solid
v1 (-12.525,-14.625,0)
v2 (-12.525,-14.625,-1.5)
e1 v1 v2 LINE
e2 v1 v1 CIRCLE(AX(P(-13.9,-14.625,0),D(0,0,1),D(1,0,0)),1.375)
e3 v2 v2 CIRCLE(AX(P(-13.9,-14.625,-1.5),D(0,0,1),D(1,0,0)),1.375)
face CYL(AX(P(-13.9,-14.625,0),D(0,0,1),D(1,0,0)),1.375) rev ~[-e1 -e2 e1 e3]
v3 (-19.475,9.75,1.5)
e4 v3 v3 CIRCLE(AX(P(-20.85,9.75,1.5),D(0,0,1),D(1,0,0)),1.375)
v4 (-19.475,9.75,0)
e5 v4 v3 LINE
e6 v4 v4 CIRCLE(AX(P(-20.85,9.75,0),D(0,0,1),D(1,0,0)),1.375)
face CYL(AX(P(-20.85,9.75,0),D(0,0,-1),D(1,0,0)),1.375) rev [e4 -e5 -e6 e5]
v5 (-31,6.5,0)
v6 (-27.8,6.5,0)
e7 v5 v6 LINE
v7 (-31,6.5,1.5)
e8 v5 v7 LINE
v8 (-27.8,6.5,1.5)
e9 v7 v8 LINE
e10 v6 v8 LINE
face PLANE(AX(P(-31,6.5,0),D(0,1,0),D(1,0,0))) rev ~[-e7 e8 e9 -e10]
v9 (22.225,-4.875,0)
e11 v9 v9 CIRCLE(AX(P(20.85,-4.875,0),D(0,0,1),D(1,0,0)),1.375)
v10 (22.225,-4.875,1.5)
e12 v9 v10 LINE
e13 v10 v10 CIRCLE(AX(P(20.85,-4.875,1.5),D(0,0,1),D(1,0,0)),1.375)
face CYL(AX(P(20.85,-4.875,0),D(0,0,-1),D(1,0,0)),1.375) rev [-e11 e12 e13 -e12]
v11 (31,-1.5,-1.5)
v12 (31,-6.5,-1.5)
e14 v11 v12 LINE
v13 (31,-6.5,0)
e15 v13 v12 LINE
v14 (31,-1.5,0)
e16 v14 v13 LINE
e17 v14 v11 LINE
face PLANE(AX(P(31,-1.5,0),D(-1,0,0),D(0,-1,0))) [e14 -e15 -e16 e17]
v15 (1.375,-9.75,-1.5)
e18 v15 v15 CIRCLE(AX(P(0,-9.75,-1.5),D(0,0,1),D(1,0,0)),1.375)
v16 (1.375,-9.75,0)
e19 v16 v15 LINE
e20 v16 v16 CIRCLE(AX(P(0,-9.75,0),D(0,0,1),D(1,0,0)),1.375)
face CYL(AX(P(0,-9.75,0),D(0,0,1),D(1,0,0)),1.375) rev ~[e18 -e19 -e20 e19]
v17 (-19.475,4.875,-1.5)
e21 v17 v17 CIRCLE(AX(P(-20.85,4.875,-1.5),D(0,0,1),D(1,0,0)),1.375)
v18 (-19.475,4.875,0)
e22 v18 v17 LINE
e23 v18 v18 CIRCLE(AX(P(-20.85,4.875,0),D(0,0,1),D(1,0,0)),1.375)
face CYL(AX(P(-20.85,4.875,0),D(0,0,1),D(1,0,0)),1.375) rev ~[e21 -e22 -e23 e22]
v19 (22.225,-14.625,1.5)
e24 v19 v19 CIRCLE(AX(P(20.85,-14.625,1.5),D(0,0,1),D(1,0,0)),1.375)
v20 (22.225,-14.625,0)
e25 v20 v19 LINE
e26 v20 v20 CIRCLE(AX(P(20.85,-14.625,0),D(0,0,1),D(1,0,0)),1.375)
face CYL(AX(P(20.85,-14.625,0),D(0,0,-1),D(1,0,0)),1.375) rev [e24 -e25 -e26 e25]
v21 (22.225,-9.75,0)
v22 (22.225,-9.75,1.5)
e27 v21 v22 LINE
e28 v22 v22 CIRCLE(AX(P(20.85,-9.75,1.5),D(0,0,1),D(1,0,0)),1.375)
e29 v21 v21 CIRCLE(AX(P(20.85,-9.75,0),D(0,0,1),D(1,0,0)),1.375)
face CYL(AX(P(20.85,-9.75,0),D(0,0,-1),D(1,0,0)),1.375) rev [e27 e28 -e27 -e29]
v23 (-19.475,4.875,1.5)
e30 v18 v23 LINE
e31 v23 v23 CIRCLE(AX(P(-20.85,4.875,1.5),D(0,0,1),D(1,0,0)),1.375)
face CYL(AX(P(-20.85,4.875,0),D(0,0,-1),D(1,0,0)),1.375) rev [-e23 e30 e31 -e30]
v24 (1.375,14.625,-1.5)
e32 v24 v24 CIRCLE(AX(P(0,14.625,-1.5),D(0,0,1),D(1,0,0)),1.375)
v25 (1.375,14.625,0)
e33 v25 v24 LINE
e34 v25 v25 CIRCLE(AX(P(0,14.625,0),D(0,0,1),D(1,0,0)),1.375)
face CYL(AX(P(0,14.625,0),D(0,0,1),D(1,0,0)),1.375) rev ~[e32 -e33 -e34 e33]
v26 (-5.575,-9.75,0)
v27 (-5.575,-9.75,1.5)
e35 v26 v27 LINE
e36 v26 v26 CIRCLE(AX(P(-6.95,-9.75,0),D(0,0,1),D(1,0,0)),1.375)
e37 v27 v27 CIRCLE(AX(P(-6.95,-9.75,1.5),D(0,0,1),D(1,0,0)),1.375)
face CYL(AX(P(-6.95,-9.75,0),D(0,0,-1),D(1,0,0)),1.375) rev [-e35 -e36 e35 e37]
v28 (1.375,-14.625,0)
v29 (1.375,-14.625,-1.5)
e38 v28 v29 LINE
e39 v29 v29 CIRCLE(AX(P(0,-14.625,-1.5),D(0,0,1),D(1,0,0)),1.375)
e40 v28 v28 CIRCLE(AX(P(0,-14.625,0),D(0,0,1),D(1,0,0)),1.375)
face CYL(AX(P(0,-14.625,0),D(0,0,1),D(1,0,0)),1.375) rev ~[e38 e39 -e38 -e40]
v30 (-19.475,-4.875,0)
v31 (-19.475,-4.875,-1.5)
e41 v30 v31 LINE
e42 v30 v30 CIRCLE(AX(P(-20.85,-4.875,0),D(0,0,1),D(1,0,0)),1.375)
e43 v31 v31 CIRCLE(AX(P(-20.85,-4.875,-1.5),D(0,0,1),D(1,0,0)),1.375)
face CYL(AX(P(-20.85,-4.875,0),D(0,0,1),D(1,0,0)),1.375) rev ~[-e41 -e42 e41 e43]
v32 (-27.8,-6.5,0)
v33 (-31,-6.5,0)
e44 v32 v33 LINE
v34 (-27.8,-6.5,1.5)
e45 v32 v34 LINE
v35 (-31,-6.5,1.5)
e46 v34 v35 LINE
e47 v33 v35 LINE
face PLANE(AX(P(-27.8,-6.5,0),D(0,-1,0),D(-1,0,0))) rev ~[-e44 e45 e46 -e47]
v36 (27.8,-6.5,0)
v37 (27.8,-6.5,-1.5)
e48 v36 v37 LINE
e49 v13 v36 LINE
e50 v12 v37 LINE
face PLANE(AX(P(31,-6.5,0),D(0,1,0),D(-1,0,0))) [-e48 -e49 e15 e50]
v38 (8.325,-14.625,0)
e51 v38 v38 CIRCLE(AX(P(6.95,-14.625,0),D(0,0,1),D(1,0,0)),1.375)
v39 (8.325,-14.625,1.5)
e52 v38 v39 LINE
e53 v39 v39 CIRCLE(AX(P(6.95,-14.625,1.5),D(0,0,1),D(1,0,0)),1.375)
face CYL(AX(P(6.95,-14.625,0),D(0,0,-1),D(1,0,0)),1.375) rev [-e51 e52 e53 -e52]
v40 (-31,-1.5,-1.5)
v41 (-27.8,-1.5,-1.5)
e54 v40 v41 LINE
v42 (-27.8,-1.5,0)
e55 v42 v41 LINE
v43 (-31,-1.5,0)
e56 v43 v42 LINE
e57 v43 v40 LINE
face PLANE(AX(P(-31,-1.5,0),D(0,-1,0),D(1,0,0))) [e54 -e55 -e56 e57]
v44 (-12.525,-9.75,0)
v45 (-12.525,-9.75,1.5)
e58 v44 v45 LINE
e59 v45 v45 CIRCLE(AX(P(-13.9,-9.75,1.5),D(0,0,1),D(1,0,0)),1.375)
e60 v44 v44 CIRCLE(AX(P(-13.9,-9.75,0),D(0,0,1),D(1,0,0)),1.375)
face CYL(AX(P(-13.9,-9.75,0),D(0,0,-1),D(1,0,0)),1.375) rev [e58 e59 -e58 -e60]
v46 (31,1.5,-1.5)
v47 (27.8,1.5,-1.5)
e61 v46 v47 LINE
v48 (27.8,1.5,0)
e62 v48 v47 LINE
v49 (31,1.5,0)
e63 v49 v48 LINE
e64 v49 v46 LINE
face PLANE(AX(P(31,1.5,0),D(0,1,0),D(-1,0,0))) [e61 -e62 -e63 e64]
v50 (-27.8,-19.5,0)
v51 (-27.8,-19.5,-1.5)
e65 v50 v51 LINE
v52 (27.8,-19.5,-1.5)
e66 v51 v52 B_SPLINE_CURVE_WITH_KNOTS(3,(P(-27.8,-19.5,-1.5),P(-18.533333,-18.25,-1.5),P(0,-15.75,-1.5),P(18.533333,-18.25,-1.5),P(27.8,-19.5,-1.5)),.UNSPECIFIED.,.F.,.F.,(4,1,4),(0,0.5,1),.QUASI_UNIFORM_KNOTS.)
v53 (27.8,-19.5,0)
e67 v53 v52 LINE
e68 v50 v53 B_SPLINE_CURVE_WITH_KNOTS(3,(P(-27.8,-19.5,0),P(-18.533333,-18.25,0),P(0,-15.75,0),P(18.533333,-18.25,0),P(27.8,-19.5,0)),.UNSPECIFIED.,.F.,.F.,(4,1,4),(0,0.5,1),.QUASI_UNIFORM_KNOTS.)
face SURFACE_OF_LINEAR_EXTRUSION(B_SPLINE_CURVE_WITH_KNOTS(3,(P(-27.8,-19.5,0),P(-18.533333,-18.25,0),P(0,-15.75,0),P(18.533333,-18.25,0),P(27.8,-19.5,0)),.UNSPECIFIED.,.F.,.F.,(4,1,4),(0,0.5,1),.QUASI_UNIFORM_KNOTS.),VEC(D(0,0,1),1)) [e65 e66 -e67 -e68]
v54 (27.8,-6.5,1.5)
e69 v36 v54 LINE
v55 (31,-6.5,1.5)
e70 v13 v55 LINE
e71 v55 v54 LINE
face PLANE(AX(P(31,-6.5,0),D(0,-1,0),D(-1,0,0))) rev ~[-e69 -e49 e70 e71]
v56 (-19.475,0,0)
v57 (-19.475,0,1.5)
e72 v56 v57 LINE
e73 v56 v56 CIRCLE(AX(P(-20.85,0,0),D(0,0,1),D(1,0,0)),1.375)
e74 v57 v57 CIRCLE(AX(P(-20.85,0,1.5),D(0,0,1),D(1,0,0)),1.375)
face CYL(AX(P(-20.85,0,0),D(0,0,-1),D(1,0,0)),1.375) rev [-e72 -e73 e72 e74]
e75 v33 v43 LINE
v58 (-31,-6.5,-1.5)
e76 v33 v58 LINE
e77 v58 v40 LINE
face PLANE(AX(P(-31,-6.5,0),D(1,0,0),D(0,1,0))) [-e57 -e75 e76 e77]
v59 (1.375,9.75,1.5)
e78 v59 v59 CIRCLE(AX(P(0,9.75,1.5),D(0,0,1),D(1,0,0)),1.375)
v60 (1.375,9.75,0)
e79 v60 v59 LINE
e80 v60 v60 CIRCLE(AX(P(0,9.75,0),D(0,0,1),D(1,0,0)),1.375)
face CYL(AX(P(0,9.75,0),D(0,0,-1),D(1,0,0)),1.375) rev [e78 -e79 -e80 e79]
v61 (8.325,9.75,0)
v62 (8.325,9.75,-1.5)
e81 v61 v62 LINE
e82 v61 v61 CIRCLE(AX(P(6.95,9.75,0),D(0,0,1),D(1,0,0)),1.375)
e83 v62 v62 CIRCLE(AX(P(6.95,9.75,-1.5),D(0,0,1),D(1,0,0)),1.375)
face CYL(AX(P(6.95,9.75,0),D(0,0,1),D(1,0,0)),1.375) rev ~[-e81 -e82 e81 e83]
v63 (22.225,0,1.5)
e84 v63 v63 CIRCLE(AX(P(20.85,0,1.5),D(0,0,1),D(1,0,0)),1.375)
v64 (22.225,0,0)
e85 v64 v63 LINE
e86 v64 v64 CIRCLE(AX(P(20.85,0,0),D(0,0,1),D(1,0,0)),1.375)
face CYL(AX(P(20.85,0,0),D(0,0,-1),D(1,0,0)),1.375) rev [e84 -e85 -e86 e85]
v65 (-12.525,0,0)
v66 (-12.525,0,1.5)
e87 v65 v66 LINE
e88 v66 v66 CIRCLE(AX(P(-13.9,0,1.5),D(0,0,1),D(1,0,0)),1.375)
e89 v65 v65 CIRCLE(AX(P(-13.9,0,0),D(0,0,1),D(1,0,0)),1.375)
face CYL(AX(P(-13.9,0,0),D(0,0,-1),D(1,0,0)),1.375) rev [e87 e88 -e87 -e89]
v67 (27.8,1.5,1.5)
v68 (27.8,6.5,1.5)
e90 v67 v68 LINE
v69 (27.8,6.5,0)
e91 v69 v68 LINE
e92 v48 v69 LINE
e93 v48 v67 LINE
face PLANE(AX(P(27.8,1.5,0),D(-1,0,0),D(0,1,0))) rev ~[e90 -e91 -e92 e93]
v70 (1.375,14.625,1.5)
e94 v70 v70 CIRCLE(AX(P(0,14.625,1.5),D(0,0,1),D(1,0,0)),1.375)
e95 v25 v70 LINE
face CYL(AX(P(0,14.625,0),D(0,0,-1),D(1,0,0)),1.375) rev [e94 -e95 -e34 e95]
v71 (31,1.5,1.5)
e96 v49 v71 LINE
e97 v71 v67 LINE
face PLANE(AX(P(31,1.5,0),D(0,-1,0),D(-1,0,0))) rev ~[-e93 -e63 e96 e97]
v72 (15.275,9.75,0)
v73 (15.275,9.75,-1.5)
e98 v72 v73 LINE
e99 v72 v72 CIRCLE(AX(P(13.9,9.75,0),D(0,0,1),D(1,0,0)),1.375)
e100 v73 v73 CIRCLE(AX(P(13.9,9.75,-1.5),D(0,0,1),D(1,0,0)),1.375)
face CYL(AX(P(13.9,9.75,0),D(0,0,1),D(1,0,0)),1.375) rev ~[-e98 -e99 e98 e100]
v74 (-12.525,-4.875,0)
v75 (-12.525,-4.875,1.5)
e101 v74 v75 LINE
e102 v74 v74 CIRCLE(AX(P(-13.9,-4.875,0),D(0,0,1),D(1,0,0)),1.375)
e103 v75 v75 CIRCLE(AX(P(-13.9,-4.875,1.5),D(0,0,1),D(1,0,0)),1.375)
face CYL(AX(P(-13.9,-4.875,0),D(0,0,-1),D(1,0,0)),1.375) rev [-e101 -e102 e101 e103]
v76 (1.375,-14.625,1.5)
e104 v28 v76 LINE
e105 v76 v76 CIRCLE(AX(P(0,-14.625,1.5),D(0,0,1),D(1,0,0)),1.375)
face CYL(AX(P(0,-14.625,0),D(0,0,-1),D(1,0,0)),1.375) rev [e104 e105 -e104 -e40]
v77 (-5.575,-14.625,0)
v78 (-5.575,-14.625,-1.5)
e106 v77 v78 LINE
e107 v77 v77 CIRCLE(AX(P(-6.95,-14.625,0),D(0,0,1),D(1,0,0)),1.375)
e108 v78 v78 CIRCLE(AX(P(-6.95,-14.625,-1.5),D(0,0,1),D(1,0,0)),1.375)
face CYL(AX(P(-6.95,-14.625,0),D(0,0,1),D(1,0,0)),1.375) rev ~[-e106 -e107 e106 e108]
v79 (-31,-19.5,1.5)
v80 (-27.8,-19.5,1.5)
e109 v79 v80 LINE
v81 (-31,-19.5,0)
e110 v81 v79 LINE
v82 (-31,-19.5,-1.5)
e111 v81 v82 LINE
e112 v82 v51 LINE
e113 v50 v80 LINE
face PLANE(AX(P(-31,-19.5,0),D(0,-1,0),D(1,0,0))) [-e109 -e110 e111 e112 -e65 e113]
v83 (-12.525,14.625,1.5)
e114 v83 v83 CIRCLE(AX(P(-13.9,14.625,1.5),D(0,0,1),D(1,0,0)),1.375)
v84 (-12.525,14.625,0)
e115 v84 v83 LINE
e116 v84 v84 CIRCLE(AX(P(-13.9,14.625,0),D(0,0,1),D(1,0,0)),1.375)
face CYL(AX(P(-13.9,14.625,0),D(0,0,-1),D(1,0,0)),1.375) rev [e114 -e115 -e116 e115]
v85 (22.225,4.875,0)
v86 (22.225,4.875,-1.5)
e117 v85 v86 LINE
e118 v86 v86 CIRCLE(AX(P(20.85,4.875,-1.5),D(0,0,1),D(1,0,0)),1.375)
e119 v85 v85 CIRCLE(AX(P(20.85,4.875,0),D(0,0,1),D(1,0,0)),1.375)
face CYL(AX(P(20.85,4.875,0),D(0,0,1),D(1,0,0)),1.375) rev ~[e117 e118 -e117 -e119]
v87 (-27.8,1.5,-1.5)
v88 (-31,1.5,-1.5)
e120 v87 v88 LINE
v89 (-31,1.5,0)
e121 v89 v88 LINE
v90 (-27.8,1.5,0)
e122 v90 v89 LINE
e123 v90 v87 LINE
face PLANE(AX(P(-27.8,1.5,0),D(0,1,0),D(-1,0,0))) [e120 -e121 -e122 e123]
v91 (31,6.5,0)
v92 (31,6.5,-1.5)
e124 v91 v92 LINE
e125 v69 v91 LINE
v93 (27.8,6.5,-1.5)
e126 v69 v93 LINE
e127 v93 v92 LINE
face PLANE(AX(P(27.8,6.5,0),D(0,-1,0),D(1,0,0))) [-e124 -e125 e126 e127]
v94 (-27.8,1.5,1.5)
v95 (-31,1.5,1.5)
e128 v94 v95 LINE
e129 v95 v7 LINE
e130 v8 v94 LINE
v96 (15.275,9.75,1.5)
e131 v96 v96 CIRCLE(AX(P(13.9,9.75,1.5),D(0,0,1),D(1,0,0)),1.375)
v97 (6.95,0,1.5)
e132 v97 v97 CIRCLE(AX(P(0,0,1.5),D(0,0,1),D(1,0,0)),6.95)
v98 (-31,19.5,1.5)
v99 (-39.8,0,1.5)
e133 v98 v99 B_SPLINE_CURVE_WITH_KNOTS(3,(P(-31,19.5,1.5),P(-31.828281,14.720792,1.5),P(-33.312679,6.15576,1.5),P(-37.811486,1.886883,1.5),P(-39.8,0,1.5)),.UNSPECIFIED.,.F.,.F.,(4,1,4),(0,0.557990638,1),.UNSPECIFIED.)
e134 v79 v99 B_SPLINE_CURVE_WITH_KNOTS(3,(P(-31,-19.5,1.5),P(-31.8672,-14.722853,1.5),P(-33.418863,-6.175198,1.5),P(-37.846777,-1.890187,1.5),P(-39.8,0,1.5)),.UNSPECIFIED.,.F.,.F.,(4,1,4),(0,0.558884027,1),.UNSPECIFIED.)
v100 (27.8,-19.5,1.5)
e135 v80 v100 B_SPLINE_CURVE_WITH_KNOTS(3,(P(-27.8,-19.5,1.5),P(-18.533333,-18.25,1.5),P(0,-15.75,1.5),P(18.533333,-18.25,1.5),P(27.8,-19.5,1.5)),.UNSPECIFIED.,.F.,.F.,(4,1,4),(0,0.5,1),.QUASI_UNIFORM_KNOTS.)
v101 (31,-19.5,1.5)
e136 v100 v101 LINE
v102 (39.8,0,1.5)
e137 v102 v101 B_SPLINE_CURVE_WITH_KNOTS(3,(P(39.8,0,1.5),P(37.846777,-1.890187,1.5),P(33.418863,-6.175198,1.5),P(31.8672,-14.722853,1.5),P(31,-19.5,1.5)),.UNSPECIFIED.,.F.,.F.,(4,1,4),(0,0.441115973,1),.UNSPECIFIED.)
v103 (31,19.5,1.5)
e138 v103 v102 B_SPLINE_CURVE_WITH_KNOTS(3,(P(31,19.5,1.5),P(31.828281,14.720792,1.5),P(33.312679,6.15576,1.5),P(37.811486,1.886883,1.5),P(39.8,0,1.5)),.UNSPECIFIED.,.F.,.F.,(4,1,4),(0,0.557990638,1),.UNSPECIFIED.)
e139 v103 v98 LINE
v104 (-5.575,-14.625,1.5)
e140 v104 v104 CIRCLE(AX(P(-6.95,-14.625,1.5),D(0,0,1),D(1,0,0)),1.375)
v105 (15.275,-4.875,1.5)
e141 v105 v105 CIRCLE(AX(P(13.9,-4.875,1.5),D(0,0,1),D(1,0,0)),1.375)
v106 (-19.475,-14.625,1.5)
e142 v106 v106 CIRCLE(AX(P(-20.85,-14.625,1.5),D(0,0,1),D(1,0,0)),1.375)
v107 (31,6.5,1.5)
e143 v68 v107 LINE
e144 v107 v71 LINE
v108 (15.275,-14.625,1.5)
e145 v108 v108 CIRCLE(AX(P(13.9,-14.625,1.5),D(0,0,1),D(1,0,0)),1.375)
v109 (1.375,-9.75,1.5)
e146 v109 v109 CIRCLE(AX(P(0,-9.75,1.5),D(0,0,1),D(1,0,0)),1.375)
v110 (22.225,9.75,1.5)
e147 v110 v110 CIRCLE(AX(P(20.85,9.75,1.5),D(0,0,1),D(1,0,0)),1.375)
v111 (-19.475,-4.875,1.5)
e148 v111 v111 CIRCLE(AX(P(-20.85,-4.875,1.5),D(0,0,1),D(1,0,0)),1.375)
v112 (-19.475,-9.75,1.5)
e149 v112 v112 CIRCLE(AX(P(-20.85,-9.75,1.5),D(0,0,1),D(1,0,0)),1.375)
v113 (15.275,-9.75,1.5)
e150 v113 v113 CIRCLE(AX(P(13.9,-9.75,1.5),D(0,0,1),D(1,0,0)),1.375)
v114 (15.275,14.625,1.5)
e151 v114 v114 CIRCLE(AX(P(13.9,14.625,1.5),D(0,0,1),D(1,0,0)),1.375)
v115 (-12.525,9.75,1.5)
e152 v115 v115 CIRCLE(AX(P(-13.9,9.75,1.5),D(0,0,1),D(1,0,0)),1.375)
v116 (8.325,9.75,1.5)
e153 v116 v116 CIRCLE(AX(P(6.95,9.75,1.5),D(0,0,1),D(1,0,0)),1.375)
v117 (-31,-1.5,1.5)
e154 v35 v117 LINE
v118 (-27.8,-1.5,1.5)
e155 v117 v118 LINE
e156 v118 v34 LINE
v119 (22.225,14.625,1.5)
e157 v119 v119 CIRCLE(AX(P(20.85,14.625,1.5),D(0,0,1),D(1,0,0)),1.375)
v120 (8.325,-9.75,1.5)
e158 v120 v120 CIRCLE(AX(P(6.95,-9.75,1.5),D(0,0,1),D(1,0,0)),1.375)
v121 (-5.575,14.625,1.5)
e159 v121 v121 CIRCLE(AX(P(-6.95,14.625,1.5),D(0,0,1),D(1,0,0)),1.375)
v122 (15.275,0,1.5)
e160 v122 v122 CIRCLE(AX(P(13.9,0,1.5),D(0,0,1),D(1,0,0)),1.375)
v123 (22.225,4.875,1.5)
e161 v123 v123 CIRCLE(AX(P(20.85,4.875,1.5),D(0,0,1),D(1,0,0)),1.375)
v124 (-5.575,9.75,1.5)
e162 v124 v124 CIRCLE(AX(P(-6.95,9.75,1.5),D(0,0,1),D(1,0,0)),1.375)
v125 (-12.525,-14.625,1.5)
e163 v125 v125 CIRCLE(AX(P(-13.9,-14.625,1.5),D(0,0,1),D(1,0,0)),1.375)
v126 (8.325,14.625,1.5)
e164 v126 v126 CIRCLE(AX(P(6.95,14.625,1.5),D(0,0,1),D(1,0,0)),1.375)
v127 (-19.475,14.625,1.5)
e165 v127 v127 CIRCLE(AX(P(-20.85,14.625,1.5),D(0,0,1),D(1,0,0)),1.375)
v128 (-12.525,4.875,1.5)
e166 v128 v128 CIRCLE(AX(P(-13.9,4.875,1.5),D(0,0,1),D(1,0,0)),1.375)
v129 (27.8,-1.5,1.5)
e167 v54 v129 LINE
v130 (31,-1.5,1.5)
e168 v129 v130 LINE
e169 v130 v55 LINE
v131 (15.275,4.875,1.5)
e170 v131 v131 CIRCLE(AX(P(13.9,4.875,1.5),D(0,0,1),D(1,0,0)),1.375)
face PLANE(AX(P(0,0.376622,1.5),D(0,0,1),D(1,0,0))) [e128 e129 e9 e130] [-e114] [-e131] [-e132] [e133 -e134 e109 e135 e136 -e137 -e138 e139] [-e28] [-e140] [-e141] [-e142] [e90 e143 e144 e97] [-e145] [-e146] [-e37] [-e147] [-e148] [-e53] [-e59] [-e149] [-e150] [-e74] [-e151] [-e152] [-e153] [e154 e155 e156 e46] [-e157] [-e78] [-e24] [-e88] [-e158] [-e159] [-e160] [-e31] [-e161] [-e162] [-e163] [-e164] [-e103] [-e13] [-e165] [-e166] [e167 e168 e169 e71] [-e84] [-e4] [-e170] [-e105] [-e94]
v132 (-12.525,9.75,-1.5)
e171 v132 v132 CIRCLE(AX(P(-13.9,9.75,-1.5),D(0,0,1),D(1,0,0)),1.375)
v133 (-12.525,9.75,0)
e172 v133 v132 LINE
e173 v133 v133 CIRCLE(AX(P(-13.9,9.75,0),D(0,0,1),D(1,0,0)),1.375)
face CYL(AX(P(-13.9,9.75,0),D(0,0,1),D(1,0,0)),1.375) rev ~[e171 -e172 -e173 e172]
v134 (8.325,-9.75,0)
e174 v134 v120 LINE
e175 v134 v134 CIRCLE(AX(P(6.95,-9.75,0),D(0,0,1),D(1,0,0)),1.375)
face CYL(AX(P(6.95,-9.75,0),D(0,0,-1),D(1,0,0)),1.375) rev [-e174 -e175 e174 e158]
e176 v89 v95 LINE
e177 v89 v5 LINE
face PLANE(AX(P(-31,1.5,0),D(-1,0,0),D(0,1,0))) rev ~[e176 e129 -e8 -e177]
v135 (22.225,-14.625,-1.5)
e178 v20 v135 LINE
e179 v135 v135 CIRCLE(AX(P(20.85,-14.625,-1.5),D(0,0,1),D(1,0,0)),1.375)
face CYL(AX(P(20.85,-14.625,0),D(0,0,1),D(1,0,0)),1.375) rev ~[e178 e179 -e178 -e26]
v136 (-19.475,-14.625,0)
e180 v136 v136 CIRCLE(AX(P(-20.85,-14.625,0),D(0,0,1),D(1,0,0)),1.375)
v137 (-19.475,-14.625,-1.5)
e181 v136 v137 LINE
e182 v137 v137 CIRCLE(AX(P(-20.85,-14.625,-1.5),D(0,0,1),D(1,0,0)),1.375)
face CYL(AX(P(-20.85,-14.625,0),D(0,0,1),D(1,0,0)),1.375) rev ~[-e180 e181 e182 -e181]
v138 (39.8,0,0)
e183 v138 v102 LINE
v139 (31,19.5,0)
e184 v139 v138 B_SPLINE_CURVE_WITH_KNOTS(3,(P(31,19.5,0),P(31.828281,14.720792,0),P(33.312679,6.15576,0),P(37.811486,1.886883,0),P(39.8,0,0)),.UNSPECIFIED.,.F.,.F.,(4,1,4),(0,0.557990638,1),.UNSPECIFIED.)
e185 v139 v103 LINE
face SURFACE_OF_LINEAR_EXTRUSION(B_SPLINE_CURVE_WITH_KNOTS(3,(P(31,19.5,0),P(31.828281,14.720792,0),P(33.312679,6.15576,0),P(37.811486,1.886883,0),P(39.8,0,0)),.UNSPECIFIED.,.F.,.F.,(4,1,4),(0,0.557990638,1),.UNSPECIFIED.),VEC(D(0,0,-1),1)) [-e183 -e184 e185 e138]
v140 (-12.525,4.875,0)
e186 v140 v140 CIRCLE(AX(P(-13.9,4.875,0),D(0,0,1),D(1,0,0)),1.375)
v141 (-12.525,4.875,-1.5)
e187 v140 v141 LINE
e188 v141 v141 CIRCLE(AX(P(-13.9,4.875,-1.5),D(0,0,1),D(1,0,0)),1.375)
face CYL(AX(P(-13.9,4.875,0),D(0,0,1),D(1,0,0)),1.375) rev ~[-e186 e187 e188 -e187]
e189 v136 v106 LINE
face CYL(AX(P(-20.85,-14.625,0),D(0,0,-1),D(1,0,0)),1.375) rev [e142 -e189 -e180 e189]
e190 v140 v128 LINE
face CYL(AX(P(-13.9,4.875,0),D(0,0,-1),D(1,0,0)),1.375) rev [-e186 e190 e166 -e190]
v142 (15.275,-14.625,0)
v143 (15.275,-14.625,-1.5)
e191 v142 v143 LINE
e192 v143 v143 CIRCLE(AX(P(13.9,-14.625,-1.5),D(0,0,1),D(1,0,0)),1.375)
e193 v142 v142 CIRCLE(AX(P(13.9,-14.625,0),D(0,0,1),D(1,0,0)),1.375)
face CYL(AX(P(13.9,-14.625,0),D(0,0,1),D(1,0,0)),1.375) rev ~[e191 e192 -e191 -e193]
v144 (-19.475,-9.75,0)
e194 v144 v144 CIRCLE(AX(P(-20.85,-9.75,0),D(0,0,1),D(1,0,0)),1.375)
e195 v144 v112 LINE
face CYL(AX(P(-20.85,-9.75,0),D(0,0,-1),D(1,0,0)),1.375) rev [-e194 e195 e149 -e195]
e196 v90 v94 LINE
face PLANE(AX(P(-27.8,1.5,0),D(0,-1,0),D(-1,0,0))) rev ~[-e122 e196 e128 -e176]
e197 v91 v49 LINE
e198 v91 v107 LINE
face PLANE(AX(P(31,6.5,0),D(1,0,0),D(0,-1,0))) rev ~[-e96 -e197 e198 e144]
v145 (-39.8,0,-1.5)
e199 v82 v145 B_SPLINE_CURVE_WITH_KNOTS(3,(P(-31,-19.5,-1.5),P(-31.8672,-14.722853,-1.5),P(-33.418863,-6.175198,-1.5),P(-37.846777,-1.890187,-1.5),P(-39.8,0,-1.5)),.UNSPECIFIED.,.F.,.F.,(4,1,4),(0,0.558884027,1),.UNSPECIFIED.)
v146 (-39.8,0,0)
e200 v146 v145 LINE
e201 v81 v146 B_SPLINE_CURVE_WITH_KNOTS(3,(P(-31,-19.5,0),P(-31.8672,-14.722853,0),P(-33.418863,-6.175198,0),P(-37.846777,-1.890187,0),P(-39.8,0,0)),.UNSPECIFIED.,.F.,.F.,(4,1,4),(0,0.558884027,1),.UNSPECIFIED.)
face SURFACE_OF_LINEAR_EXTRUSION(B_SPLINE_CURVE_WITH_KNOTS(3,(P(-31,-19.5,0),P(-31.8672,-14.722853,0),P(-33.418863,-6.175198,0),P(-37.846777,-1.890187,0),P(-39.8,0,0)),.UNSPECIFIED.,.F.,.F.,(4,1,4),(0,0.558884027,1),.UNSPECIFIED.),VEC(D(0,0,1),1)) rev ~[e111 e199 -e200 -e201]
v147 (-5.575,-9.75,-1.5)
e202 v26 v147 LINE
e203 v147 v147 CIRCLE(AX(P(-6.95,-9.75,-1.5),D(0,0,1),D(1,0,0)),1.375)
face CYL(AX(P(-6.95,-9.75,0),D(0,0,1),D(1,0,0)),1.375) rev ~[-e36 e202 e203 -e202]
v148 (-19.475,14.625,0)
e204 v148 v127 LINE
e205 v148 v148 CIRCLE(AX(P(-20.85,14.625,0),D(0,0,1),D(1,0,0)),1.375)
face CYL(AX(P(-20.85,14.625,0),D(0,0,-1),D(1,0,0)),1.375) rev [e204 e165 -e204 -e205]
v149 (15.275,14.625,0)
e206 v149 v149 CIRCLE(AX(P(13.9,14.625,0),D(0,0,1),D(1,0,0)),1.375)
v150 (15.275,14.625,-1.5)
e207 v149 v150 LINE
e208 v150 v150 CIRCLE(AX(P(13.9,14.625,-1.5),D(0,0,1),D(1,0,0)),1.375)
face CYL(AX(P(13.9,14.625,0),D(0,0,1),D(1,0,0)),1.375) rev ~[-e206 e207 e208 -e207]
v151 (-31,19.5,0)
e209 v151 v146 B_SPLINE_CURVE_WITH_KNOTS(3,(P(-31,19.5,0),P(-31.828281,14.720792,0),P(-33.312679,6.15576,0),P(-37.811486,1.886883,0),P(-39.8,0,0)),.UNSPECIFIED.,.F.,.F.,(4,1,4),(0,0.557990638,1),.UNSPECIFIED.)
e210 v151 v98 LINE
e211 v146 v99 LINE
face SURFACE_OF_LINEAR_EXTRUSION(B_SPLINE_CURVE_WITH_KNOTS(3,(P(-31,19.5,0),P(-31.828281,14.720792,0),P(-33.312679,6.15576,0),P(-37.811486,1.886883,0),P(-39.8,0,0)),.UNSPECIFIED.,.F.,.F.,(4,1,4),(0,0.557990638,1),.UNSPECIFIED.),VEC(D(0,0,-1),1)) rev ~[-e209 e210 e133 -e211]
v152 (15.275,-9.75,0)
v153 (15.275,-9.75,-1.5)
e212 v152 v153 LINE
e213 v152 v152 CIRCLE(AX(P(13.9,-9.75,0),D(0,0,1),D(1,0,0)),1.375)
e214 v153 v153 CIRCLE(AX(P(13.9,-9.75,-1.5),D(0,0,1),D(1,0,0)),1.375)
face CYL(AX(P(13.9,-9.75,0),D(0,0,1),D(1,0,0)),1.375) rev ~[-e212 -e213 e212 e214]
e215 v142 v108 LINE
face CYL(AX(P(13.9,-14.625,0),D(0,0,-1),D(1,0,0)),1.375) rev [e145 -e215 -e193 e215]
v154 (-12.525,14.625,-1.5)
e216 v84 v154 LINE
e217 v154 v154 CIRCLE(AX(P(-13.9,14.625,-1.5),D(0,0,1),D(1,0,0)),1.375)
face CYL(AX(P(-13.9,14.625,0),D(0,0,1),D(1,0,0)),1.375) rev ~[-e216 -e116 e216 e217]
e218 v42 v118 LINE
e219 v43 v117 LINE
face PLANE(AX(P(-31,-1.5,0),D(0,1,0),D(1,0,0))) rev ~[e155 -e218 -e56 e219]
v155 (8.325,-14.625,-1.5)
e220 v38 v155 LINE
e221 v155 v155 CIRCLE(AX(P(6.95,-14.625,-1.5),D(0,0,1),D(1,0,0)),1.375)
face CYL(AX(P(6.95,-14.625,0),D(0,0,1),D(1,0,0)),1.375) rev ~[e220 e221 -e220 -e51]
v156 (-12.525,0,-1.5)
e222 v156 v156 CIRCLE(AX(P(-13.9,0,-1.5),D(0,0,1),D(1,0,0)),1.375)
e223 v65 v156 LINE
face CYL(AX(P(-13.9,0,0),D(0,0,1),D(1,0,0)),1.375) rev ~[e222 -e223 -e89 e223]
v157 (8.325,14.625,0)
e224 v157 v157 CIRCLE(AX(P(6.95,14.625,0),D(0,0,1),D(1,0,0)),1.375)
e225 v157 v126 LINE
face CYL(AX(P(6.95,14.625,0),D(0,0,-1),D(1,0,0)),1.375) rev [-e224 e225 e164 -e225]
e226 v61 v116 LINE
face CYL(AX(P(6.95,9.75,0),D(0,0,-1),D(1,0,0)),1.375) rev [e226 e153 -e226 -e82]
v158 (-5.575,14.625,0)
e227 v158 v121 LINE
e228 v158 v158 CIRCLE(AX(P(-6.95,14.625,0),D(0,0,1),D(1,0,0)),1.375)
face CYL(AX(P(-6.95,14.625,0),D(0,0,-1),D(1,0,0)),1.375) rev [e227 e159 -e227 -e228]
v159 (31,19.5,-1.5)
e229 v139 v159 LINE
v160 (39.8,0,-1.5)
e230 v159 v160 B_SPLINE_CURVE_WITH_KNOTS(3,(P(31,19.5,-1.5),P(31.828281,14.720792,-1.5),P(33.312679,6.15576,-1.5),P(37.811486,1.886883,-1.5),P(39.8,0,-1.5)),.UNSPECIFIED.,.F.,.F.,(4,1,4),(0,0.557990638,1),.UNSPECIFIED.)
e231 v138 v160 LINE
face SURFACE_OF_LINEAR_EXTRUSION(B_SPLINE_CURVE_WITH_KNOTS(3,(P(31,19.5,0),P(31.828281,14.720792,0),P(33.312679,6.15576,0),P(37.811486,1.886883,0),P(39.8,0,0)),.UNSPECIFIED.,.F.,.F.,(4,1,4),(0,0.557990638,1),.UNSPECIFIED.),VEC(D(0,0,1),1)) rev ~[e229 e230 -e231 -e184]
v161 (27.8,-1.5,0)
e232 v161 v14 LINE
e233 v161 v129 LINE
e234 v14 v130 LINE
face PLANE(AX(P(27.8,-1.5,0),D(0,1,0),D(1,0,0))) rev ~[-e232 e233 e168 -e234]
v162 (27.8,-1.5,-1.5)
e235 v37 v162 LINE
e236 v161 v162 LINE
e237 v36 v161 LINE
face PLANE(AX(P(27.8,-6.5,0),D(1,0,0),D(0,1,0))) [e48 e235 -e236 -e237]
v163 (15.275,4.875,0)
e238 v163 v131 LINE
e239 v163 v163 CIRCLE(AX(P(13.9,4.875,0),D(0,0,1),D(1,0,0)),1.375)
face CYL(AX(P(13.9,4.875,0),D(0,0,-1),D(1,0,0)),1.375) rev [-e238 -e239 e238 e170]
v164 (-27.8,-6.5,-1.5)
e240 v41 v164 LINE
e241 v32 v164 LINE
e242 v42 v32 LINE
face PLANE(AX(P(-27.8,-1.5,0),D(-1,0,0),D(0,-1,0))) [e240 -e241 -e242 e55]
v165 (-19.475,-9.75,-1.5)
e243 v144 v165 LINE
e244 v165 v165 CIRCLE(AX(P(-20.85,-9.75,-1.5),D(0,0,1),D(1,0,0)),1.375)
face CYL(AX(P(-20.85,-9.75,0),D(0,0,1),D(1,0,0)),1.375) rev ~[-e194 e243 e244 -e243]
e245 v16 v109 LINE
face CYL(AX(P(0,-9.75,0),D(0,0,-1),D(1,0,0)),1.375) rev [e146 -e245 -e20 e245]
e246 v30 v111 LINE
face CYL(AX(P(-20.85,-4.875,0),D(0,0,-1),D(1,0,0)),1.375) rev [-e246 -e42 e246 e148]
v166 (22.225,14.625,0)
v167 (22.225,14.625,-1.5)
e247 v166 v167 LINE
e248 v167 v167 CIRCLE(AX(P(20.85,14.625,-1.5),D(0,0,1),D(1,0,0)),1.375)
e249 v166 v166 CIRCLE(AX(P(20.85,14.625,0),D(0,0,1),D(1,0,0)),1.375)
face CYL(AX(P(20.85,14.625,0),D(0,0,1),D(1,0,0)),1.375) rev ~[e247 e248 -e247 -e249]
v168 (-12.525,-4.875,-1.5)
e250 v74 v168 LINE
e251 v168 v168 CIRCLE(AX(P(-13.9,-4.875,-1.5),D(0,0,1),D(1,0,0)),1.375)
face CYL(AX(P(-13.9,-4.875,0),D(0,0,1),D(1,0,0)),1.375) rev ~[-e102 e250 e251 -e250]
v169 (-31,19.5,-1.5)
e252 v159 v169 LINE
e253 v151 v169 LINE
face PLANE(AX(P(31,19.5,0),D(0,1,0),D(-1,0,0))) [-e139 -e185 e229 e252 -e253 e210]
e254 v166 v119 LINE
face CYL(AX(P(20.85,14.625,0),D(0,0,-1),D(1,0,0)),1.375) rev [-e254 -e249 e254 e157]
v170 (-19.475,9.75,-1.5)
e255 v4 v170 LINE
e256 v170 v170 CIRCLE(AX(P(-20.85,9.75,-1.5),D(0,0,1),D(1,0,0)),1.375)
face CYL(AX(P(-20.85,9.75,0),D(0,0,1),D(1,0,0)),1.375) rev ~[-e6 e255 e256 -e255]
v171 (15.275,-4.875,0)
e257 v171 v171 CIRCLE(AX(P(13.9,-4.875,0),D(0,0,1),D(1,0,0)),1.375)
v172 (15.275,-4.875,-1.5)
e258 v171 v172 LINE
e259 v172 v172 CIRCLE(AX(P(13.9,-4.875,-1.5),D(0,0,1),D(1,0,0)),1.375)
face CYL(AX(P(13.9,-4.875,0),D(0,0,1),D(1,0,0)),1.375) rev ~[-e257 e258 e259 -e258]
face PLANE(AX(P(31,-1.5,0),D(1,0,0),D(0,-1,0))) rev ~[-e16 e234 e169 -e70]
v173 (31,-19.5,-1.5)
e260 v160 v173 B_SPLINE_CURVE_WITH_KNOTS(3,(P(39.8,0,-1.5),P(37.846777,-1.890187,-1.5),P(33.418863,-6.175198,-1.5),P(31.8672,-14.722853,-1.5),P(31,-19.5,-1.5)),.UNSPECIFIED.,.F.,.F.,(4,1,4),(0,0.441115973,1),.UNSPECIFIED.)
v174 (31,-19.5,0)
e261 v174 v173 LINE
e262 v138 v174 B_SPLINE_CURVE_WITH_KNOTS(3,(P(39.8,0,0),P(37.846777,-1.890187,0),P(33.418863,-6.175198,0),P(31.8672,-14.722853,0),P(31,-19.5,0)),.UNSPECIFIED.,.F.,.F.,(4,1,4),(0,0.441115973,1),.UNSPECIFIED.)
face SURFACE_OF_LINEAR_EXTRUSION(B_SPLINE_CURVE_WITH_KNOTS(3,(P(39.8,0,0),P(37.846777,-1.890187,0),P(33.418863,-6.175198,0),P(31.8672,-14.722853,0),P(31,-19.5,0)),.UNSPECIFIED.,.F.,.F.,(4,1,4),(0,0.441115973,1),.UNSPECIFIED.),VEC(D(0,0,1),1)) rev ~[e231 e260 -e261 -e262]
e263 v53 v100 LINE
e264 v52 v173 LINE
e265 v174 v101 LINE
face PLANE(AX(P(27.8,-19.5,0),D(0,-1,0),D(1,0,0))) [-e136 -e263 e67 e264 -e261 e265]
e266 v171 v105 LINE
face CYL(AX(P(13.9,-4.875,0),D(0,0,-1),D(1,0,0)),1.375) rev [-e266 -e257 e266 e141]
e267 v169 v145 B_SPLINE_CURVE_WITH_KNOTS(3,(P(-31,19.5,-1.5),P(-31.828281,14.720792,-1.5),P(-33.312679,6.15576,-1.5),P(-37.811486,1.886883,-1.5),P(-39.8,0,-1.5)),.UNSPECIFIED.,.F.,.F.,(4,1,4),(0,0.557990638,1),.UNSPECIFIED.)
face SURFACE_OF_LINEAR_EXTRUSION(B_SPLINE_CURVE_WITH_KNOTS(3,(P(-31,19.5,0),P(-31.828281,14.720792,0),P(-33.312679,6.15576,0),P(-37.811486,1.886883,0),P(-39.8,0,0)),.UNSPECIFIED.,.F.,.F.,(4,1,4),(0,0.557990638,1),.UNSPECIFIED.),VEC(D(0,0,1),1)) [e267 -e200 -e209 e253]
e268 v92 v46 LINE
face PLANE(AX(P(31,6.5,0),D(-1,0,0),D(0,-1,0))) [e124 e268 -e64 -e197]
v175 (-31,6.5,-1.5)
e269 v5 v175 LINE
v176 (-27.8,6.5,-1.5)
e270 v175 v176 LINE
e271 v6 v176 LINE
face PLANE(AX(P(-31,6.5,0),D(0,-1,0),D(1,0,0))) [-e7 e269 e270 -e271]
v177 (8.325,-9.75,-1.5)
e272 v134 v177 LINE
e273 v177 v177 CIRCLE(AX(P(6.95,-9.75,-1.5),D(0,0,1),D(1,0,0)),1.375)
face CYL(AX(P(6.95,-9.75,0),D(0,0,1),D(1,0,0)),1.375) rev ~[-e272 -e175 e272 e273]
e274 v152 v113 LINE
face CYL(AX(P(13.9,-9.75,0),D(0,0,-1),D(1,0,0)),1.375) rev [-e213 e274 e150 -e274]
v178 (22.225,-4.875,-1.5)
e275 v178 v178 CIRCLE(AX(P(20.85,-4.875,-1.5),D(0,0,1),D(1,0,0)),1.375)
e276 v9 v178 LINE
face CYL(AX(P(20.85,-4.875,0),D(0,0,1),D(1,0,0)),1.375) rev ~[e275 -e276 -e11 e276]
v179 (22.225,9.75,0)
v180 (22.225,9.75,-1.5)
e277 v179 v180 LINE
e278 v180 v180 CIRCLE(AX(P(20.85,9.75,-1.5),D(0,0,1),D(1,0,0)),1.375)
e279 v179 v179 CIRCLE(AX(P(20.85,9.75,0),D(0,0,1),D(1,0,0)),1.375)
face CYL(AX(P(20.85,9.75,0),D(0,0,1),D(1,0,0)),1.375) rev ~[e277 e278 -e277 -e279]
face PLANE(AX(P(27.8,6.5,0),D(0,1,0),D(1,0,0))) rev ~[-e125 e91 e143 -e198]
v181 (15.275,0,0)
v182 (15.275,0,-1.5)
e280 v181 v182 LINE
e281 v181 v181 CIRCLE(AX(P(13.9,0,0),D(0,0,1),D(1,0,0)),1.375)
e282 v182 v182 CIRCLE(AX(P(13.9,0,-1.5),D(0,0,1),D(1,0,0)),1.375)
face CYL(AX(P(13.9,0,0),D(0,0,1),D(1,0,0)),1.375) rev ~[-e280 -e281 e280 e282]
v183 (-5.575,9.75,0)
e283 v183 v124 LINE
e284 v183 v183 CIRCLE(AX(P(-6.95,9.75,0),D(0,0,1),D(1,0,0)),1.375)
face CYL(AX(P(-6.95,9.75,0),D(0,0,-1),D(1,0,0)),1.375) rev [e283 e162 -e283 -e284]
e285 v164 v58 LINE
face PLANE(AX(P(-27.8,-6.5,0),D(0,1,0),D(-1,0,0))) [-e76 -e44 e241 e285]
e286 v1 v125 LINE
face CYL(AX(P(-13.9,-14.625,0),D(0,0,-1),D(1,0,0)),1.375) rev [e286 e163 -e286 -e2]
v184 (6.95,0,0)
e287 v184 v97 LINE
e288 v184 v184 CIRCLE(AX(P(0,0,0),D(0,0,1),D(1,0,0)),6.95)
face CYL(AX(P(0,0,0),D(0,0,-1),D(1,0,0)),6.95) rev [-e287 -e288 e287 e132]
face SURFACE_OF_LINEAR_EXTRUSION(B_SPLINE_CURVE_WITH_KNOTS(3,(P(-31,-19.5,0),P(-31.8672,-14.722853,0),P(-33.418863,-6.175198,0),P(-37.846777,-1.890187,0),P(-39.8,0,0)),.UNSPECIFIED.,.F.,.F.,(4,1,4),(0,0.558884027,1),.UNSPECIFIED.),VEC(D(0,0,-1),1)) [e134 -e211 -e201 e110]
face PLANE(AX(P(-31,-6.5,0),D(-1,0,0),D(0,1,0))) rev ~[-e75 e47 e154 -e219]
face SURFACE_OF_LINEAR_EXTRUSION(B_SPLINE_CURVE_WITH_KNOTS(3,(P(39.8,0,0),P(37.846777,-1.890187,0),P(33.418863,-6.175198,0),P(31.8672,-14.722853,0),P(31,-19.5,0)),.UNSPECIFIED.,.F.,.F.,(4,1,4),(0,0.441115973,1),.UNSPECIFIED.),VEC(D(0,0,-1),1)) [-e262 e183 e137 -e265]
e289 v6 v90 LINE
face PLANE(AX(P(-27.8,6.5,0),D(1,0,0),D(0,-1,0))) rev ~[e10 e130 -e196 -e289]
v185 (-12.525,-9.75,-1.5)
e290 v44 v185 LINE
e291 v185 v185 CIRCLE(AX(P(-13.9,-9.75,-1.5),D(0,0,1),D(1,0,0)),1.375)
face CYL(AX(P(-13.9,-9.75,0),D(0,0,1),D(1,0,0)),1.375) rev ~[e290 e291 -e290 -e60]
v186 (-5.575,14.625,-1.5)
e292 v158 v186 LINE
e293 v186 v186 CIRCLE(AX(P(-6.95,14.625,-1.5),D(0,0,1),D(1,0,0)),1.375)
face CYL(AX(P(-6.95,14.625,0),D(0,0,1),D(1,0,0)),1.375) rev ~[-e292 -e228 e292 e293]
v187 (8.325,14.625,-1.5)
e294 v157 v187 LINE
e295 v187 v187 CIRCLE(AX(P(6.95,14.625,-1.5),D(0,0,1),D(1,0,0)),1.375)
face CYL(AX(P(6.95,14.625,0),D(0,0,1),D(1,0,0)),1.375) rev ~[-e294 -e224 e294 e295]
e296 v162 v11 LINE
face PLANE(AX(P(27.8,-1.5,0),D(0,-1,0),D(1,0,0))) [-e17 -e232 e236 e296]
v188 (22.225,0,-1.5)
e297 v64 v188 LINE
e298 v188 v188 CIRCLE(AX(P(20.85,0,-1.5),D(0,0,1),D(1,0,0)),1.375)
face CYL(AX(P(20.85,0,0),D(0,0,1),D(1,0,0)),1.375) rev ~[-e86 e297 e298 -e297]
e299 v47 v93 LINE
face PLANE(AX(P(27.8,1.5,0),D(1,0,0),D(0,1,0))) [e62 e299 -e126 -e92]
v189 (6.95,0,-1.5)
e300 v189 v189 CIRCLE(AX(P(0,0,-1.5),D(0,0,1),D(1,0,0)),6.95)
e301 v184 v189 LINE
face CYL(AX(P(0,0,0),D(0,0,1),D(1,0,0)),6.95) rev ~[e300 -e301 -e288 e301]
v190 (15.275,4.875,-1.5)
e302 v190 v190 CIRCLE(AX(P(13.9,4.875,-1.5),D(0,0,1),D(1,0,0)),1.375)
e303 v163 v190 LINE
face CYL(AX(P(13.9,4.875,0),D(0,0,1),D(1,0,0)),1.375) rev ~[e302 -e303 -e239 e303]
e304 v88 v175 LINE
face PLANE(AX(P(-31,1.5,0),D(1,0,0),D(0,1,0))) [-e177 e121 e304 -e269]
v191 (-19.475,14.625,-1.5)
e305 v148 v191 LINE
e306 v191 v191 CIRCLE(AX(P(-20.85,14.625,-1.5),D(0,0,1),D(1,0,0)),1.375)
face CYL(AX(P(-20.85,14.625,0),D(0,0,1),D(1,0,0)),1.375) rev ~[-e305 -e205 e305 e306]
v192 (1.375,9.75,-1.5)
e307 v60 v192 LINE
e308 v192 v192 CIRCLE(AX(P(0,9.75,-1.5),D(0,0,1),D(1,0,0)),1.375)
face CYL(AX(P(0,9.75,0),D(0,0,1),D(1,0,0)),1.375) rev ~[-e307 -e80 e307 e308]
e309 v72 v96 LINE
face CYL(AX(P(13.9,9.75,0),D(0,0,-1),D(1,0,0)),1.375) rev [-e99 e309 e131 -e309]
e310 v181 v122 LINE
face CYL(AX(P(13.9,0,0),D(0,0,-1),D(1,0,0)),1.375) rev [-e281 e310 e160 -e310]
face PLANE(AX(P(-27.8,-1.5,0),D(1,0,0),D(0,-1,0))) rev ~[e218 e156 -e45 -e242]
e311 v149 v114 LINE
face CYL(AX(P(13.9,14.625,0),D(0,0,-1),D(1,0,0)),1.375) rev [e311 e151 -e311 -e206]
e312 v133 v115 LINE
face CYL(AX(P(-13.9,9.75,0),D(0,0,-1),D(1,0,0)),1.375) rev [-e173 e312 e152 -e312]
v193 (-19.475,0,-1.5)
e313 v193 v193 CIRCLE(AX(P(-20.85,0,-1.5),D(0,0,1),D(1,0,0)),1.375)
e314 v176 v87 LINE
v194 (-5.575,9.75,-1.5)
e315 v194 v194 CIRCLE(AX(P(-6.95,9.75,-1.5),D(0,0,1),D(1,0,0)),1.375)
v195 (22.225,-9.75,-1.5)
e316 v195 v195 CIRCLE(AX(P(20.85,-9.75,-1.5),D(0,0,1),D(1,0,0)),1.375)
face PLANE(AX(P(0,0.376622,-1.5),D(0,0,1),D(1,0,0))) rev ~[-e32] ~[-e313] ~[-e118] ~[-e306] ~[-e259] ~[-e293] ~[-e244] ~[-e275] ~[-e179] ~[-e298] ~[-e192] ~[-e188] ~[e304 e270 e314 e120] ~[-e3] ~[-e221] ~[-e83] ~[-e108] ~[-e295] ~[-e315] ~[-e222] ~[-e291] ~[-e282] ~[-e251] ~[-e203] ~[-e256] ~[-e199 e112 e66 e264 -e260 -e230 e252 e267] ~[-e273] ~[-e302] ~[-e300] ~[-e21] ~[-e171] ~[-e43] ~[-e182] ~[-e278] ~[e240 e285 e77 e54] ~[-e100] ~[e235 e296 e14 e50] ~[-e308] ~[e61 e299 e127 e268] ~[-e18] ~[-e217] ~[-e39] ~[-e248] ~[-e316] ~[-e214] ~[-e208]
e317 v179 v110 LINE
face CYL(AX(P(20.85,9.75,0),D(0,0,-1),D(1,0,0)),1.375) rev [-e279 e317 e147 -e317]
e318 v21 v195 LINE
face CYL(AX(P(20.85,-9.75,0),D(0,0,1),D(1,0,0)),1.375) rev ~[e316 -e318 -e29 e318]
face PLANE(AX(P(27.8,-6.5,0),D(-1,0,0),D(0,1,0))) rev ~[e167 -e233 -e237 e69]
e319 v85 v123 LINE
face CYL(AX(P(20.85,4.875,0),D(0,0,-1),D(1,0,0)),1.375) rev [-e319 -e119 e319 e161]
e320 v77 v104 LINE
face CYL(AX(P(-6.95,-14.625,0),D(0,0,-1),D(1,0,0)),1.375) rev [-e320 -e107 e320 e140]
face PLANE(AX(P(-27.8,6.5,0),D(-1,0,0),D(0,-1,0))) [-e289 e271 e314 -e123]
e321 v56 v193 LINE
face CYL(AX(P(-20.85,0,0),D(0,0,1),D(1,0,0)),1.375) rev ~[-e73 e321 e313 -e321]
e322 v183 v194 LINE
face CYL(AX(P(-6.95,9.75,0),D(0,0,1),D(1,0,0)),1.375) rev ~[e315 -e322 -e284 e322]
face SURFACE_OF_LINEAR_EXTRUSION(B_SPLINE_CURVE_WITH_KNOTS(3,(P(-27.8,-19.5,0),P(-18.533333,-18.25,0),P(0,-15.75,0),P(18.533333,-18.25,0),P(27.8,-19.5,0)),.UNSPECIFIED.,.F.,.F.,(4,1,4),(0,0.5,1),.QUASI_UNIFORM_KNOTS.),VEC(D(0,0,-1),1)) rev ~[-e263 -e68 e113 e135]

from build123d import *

# Parameters (mm, degrees)
F0_R     = 1.375
F0_R_2   = 6.95
F1_DEPTH = 1.5


with BuildPart() as f1:
    # F0 (on Top) → F1 (new body, symmetric)
    with BuildSketch(Plane.XY):
        with BuildLine():
            Line((-31, -19.5), (-27.8, -19.5))
            add(Edge.make_bspline(
                [(-27.8, -19.5), (-18.5333333333, -18.25), (0, -15.75), (18.5333333333, -18.25), (27.8, -19.5)],
                knots=[0, 0, 0, 0, 0.5, 1, 1, 1, 1], degree=3))
            Line((27.8, -19.5), (31, -19.5))
            add(Edge.make_bspline(
                [(39.8, 0), (37.8467765607, -1.8901869566), (33.4188629122, -6.1751983155), (31.8671997538, -14.7228525715), (31, -19.5)],
                knots=[0, 0, 0, 0, 0.4411159734, 1, 1, 1, 1], degree=3))
            add(Edge.make_bspline(
                [(31, 19.5), (31.8282806058, 14.7207922386), (33.3126793566, 6.1557600729), (37.8114855459, 1.8868834383), (39.8, 0)],
                knots=[0, 0, 0, 0, 0.5579906379, 1, 1, 1, 1], degree=3))
            Line((31, 19.5), (27.8, 19.5))
            Line((27.8, 19.5), (-27.8, 19.5))
            Line((-27.8, 19.5), (-31, 19.5))
            add(Edge.make_bspline(
                [(-31, 19.5), (-31.8282806058, 14.7207922386), (-33.3126793566, 6.1557600729), (-37.8114855459, 1.8868834383), (-39.8, 0)],
                knots=[0, 0, 0, 0, 0.5579906379, 1, 1, 1, 1], degree=3))
            add(Edge.make_bspline(
                [(-31, -19.5), (-31.8671997538, -14.7228525715), (-33.4188629122, -6.1751983155), (-37.8467765607, -1.8901869566), (-39.8, 0)],
                knots=[0, 0, 0, 0, 0.5588840266, 1, 1, 1, 1], degree=3))
        make_face()
        with Locations((-20.85, -14.625)):
            Circle(F0_R, mode=Mode.SUBTRACT)
        with Locations((-13.9, -14.625)):
            Circle(F0_R, mode=Mode.SUBTRACT)
        with Locations((-6.95, -14.625)):
            Circle(F0_R, mode=Mode.SUBTRACT)
        with Locations((-20.85, -9.75)):
            Circle(F0_R, mode=Mode.SUBTRACT)
        Polygon((-27.8, -3.3), (-27.8, -6.5), (-31, -6.5), (-31, -3.3), (-31, -1.5), (-27.8, -1.5), align=None, mode=Mode.SUBTRACT)
        with Locations((-20.85, -4.875)):
            Circle(F0_R, mode=Mode.SUBTRACT)
        with Locations((-13.9, -9.75)):
            Circle(F0_R, mode=Mode.SUBTRACT)
        with Locations((-6.95, -9.75)):
            Circle(F0_R, mode=Mode.SUBTRACT)
        with Locations((-13.9, -4.875)):
            Circle(F0_R, mode=Mode.SUBTRACT)
        with Locations((0, -14.625)):
            Circle(F0_R, mode=Mode.SUBTRACT)
        with Locations((6.95, -14.625)):
            Circle(F0_R, mode=Mode.SUBTRACT)
        with Locations((13.9, -14.625)):
            Circle(F0_R, mode=Mode.SUBTRACT)
        with Locations((20.85, -14.625)):
            Circle(F0_R, mode=Mode.SUBTRACT)
        with Locations((0, -9.75)):
            Circle(F0_R, mode=Mode.SUBTRACT)
        with Locations((6.95, -9.75)):
            Circle(F0_R, mode=Mode.SUBTRACT)
        with Locations((13.9, -9.75)):
            Circle(F0_R, mode=Mode.SUBTRACT)
        with Locations((13.9, -4.875)):
            Circle(F0_R, mode=Mode.SUBTRACT)
        with Locations((20.85, -9.75)):
            Circle(F0_R, mode=Mode.SUBTRACT)
        with Locations((20.85, -4.875)):
            Circle(F0_R, mode=Mode.SUBTRACT)
        Polygon((31, -3.3), (31, -6.5), (27.8, -6.5), (27.8, -4.875), (27.8, -3.3), (27.8, -1.5), (31, -1.5), align=None, mode=Mode.SUBTRACT)
        with Locations((-20.85, 0)):
            Circle(F0_R, mode=Mode.SUBTRACT)
        Polygon((-27.8, 1.8441202119), (-27.8, 1.5), (-31, 1.5), (-31, 3.6441202119), (-31, 6.5), (-27.8, 6.5), (-27.8, 4.875), align=None, mode=Mode.SUBTRACT)
        with Locations((-20.85, 4.875)):
            Circle(F0_R, mode=Mode.SUBTRACT)
        with Locations((-13.9, 0)):
            Circle(F0_R, mode=Mode.SUBTRACT)
        with Locations((-13.9, 4.875)):
            Circle(F0_R, mode=Mode.SUBTRACT)
        with Locations((-20.85, 9.75)):
            Circle(F0_R, mode=Mode.SUBTRACT)
        with Locations((-20.85, 14.625)):
            Circle(F0_R, mode=Mode.SUBTRACT)
        with Locations((-13.9, 9.75)):
            Circle(F0_R, mode=Mode.SUBTRACT)
        with Locations((-6.95, 9.75)):
            Circle(F0_R, mode=Mode.SUBTRACT)
        with Locations((-13.9, 14.625)):
            Circle(F0_R, mode=Mode.SUBTRACT)
        with Locations((-6.95, 14.625)):
            Circle(F0_R, mode=Mode.SUBTRACT)
        Circle(F0_R_2, mode=Mode.SUBTRACT)
        with Locations((13.9, 0)):
            Circle(F0_R, mode=Mode.SUBTRACT)
        with Locations((13.9, 4.875)):
            Circle(F0_R, mode=Mode.SUBTRACT)
        with Locations((20.85, 0)):
            Circle(F0_R, mode=Mode.SUBTRACT)
        Polygon((27.8, 3.3), (27.8, 6.5), (31, 6.5), (31, 1.5), (27.8, 1.5), align=None, mode=Mode.SUBTRACT)
        with Locations((20.85, 4.875)):
            Circle(F0_R, mode=Mode.SUBTRACT)
        with Locations((0, 9.75)):
            Circle(F0_R, mode=Mode.SUBTRACT)
        with Locations((6.95, 9.75)):
            Circle(F0_R, mode=Mode.SUBTRACT)
        with Locations((13.9, 9.75)):
            Circle(F0_R, mode=Mode.SUBTRACT)
        with Locations((0, 14.625)):
            Circle(F0_R, mode=Mode.SUBTRACT)
        with Locations((6.95, 14.625)):
            Circle(F0_R, mode=Mode.SUBTRACT)
        with Locations((13.9, 14.625)):
            Circle(F0_R, mode=Mode.SUBTRACT)
        with Locations((20.85, 9.75)):
            Circle(F0_R, mode=Mode.SUBTRACT)
        with Locations((20.85, 14.625)):
            Circle(F0_R, mode=Mode.SUBTRACT)
    extrude(amount=F1_DEPTH, both=True)


solid = f1.part
